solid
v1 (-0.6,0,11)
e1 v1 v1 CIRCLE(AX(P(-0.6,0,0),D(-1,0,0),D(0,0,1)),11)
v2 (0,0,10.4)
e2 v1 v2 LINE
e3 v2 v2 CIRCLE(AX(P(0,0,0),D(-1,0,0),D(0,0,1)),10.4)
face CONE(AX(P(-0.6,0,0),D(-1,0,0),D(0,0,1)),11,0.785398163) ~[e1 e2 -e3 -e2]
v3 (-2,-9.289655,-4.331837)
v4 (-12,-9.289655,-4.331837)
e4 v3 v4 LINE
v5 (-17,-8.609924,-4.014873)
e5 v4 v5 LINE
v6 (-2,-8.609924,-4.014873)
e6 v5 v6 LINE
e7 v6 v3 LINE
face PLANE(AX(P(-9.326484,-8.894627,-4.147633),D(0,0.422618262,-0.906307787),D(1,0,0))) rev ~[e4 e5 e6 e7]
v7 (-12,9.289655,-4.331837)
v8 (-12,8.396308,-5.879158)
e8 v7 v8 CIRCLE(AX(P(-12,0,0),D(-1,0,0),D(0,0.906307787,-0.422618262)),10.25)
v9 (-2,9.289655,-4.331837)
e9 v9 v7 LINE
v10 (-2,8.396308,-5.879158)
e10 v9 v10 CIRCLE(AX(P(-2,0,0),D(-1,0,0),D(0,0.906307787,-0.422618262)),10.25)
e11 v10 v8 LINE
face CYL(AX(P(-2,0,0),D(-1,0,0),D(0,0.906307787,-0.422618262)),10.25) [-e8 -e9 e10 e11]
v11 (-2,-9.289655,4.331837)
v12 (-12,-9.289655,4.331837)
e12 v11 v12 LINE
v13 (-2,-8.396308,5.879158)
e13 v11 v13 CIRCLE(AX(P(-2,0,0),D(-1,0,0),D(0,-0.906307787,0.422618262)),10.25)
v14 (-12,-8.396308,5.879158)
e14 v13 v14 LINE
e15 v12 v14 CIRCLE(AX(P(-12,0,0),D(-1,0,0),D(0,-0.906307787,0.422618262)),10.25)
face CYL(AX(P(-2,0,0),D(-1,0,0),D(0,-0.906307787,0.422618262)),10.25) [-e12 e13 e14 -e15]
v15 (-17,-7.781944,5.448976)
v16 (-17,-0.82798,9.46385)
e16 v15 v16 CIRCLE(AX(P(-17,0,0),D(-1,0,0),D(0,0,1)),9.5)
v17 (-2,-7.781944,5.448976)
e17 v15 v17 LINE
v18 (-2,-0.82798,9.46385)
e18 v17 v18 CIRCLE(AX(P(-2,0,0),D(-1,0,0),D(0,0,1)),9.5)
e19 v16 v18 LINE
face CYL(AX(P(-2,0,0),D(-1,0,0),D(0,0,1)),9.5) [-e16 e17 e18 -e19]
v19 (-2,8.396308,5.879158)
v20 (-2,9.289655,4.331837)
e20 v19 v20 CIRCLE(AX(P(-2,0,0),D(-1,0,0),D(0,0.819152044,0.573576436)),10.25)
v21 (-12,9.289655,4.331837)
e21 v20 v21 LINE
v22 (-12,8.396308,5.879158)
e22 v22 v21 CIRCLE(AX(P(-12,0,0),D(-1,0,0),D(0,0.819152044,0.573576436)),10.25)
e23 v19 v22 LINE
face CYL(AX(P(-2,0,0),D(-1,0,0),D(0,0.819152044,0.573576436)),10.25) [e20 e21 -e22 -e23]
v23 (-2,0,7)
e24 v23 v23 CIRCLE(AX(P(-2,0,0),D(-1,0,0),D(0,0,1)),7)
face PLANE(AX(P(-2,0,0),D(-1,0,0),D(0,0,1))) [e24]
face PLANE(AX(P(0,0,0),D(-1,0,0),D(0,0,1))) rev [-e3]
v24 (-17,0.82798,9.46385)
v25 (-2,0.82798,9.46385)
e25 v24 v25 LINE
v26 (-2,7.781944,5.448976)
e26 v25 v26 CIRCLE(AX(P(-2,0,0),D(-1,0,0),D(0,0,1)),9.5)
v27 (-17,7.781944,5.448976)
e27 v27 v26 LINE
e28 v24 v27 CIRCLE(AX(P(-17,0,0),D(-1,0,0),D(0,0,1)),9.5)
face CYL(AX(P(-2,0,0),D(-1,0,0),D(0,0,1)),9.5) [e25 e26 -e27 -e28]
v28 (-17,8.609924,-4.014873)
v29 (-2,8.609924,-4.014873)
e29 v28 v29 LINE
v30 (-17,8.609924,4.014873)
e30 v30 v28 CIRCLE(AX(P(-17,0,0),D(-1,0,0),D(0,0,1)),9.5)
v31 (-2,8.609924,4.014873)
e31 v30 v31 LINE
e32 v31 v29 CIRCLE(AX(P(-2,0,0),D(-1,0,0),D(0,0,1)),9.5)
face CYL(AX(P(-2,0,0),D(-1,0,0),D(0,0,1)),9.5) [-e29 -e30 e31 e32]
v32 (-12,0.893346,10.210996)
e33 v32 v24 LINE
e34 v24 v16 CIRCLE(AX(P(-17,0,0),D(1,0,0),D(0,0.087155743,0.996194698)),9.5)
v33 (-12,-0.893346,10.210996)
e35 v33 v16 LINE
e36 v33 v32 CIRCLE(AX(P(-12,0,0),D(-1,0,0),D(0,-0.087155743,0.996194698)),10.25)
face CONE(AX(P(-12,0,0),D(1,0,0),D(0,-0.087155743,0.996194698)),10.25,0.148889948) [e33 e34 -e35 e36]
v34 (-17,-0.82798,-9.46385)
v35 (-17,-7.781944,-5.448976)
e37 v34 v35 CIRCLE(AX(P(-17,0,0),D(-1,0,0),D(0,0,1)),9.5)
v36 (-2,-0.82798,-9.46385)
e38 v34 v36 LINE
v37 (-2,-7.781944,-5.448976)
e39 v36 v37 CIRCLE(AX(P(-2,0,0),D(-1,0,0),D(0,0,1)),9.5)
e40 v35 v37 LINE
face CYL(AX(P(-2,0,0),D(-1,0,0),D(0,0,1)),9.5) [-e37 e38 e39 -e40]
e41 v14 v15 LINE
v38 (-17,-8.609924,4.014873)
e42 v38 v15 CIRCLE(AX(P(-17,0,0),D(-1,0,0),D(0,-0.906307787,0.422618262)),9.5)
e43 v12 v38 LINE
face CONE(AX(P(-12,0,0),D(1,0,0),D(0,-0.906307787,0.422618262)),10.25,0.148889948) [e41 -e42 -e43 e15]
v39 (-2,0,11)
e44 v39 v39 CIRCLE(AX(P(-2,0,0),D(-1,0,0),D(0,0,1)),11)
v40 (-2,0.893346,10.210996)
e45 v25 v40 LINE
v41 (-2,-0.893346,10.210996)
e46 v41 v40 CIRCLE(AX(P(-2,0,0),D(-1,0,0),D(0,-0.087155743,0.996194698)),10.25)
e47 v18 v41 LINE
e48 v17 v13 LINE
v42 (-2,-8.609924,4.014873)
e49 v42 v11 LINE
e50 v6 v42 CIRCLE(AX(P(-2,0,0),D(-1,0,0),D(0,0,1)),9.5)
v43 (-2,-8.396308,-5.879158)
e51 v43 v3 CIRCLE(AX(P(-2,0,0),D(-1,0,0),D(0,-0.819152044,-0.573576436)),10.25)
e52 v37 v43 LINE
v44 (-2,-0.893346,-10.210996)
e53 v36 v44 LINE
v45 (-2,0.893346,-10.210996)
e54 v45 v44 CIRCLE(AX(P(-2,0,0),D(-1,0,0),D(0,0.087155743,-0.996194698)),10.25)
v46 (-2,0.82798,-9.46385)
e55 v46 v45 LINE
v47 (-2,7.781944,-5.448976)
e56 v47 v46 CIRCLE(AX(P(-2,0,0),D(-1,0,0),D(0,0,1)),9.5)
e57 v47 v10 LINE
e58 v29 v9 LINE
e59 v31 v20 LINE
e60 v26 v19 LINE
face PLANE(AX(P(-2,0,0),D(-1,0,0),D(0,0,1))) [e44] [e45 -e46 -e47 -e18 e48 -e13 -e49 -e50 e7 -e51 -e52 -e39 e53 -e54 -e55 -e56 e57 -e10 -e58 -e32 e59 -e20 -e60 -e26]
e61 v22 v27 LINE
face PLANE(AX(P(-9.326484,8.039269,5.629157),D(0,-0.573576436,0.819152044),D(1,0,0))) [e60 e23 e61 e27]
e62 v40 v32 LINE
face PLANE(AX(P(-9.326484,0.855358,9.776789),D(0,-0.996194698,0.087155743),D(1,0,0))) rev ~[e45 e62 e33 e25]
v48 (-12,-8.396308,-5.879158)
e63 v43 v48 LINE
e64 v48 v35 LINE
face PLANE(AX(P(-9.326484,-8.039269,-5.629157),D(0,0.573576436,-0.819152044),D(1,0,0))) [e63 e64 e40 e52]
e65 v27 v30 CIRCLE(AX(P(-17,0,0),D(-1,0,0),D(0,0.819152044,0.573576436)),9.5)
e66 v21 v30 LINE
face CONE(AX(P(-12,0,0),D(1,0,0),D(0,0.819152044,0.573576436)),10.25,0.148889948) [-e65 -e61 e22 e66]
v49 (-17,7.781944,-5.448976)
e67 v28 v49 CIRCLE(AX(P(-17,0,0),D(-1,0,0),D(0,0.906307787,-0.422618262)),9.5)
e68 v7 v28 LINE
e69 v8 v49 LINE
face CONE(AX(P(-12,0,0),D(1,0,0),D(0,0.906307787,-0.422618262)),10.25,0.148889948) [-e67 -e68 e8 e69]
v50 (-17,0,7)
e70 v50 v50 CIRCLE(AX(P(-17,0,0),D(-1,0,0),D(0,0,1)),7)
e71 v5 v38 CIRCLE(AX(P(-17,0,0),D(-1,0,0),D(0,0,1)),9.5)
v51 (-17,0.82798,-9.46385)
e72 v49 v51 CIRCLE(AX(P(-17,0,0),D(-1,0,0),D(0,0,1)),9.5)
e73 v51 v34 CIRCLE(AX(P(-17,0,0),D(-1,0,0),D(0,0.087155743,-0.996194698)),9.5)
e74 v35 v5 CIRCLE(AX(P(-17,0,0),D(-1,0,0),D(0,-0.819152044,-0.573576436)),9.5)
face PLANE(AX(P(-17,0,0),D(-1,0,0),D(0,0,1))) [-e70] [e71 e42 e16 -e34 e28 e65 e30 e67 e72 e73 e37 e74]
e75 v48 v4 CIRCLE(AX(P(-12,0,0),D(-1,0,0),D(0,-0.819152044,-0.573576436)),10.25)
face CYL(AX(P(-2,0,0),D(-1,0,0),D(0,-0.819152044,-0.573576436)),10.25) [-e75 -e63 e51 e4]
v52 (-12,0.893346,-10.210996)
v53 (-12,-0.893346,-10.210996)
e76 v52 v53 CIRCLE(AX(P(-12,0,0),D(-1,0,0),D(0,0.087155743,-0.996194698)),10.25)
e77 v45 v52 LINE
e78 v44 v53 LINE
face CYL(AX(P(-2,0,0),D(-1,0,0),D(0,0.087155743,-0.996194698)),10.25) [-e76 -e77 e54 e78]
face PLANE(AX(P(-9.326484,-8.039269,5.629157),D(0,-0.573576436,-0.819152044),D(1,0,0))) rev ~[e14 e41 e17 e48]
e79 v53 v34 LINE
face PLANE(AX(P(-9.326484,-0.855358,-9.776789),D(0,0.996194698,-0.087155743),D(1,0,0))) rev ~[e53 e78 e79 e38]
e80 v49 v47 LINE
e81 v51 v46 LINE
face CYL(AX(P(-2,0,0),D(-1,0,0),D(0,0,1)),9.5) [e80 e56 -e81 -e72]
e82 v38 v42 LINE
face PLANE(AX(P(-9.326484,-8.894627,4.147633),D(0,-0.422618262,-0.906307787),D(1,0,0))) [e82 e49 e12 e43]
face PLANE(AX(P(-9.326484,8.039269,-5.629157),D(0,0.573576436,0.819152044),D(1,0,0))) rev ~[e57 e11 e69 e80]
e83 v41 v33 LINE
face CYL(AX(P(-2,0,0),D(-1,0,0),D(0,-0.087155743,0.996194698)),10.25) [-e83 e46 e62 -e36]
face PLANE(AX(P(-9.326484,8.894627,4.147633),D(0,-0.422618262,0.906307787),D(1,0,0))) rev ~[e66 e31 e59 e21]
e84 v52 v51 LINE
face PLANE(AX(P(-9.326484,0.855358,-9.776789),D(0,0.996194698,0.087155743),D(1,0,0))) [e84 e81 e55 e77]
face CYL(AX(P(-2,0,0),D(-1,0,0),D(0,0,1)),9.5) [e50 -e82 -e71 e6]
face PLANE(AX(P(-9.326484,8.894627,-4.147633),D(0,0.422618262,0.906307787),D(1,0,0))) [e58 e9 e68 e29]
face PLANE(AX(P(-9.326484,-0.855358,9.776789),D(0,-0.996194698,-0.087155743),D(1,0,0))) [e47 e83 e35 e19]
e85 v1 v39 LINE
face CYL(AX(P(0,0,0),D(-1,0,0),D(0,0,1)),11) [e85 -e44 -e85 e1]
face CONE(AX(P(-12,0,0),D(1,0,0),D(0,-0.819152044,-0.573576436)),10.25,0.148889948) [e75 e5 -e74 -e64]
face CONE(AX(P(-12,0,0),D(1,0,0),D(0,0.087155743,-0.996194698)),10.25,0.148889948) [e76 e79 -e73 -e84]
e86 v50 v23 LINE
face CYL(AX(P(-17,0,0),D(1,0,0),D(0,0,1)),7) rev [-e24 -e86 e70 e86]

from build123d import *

# Parameters (mm, degrees)
F2_ANGLE_BACK   = 5
F2_ANGLE        = 10
F2_COPIES_COUNT = 6
F3_SIZE         = 0.6


# Not quite as in the source:
# - a pattern or mirror of a feature is missing from the dataset's text; its kind, count and spacing are read off the source's solid


with BuildPart() as f1:
    # F0 (on Front) → F1 (revolve)
    with BuildSketch(Plane.XZ):
        Polygon((-2, 0), (0, 0), (0, 11), (-2, 11), (-2, 10.25), (-2, 9.5), (-17, 9.5), (-17, 7), (-2, 7), align=None)
    revolve(axis=Axis((-8.5, 0, 0), (-1, 0, 0)))

    # F0 (on Front) → F2 (revolve)
    with BuildSketch(Plane.XZ, mode=Mode.PRIVATE) as f2_sk:
        Polygon((-2, 9.5), (-2, 10.25), (-12, 10.25), (-17, 9.5), align=None)
    f2 = revolve(f2_sk.sketch.rotate(Axis((-8.5, 0, 0), (-1, 0, 0)), -F2_ANGLE_BACK), axis=Axis((-8.5, 0, 0), (-1, 0, 0)), revolution_arc=F2_ANGLE)

    # F2_copies: F2 ×6 about axis
    f2_copies_axis = Axis((0, 0, 0), (1, 0, 0))
    for i in range(1, F2_COPIES_COUNT):
        add(f2.rotate(f2_copies_axis, i * 360 / F2_COPIES_COUNT))

    # F3
    f3_edges = [f1.edges().sort_by_distance(p)[0] for p in [
        (0, 0, -11),
    ]]
    chamfer(f3_edges, length=F3_SIZE)


solid = f1.part
